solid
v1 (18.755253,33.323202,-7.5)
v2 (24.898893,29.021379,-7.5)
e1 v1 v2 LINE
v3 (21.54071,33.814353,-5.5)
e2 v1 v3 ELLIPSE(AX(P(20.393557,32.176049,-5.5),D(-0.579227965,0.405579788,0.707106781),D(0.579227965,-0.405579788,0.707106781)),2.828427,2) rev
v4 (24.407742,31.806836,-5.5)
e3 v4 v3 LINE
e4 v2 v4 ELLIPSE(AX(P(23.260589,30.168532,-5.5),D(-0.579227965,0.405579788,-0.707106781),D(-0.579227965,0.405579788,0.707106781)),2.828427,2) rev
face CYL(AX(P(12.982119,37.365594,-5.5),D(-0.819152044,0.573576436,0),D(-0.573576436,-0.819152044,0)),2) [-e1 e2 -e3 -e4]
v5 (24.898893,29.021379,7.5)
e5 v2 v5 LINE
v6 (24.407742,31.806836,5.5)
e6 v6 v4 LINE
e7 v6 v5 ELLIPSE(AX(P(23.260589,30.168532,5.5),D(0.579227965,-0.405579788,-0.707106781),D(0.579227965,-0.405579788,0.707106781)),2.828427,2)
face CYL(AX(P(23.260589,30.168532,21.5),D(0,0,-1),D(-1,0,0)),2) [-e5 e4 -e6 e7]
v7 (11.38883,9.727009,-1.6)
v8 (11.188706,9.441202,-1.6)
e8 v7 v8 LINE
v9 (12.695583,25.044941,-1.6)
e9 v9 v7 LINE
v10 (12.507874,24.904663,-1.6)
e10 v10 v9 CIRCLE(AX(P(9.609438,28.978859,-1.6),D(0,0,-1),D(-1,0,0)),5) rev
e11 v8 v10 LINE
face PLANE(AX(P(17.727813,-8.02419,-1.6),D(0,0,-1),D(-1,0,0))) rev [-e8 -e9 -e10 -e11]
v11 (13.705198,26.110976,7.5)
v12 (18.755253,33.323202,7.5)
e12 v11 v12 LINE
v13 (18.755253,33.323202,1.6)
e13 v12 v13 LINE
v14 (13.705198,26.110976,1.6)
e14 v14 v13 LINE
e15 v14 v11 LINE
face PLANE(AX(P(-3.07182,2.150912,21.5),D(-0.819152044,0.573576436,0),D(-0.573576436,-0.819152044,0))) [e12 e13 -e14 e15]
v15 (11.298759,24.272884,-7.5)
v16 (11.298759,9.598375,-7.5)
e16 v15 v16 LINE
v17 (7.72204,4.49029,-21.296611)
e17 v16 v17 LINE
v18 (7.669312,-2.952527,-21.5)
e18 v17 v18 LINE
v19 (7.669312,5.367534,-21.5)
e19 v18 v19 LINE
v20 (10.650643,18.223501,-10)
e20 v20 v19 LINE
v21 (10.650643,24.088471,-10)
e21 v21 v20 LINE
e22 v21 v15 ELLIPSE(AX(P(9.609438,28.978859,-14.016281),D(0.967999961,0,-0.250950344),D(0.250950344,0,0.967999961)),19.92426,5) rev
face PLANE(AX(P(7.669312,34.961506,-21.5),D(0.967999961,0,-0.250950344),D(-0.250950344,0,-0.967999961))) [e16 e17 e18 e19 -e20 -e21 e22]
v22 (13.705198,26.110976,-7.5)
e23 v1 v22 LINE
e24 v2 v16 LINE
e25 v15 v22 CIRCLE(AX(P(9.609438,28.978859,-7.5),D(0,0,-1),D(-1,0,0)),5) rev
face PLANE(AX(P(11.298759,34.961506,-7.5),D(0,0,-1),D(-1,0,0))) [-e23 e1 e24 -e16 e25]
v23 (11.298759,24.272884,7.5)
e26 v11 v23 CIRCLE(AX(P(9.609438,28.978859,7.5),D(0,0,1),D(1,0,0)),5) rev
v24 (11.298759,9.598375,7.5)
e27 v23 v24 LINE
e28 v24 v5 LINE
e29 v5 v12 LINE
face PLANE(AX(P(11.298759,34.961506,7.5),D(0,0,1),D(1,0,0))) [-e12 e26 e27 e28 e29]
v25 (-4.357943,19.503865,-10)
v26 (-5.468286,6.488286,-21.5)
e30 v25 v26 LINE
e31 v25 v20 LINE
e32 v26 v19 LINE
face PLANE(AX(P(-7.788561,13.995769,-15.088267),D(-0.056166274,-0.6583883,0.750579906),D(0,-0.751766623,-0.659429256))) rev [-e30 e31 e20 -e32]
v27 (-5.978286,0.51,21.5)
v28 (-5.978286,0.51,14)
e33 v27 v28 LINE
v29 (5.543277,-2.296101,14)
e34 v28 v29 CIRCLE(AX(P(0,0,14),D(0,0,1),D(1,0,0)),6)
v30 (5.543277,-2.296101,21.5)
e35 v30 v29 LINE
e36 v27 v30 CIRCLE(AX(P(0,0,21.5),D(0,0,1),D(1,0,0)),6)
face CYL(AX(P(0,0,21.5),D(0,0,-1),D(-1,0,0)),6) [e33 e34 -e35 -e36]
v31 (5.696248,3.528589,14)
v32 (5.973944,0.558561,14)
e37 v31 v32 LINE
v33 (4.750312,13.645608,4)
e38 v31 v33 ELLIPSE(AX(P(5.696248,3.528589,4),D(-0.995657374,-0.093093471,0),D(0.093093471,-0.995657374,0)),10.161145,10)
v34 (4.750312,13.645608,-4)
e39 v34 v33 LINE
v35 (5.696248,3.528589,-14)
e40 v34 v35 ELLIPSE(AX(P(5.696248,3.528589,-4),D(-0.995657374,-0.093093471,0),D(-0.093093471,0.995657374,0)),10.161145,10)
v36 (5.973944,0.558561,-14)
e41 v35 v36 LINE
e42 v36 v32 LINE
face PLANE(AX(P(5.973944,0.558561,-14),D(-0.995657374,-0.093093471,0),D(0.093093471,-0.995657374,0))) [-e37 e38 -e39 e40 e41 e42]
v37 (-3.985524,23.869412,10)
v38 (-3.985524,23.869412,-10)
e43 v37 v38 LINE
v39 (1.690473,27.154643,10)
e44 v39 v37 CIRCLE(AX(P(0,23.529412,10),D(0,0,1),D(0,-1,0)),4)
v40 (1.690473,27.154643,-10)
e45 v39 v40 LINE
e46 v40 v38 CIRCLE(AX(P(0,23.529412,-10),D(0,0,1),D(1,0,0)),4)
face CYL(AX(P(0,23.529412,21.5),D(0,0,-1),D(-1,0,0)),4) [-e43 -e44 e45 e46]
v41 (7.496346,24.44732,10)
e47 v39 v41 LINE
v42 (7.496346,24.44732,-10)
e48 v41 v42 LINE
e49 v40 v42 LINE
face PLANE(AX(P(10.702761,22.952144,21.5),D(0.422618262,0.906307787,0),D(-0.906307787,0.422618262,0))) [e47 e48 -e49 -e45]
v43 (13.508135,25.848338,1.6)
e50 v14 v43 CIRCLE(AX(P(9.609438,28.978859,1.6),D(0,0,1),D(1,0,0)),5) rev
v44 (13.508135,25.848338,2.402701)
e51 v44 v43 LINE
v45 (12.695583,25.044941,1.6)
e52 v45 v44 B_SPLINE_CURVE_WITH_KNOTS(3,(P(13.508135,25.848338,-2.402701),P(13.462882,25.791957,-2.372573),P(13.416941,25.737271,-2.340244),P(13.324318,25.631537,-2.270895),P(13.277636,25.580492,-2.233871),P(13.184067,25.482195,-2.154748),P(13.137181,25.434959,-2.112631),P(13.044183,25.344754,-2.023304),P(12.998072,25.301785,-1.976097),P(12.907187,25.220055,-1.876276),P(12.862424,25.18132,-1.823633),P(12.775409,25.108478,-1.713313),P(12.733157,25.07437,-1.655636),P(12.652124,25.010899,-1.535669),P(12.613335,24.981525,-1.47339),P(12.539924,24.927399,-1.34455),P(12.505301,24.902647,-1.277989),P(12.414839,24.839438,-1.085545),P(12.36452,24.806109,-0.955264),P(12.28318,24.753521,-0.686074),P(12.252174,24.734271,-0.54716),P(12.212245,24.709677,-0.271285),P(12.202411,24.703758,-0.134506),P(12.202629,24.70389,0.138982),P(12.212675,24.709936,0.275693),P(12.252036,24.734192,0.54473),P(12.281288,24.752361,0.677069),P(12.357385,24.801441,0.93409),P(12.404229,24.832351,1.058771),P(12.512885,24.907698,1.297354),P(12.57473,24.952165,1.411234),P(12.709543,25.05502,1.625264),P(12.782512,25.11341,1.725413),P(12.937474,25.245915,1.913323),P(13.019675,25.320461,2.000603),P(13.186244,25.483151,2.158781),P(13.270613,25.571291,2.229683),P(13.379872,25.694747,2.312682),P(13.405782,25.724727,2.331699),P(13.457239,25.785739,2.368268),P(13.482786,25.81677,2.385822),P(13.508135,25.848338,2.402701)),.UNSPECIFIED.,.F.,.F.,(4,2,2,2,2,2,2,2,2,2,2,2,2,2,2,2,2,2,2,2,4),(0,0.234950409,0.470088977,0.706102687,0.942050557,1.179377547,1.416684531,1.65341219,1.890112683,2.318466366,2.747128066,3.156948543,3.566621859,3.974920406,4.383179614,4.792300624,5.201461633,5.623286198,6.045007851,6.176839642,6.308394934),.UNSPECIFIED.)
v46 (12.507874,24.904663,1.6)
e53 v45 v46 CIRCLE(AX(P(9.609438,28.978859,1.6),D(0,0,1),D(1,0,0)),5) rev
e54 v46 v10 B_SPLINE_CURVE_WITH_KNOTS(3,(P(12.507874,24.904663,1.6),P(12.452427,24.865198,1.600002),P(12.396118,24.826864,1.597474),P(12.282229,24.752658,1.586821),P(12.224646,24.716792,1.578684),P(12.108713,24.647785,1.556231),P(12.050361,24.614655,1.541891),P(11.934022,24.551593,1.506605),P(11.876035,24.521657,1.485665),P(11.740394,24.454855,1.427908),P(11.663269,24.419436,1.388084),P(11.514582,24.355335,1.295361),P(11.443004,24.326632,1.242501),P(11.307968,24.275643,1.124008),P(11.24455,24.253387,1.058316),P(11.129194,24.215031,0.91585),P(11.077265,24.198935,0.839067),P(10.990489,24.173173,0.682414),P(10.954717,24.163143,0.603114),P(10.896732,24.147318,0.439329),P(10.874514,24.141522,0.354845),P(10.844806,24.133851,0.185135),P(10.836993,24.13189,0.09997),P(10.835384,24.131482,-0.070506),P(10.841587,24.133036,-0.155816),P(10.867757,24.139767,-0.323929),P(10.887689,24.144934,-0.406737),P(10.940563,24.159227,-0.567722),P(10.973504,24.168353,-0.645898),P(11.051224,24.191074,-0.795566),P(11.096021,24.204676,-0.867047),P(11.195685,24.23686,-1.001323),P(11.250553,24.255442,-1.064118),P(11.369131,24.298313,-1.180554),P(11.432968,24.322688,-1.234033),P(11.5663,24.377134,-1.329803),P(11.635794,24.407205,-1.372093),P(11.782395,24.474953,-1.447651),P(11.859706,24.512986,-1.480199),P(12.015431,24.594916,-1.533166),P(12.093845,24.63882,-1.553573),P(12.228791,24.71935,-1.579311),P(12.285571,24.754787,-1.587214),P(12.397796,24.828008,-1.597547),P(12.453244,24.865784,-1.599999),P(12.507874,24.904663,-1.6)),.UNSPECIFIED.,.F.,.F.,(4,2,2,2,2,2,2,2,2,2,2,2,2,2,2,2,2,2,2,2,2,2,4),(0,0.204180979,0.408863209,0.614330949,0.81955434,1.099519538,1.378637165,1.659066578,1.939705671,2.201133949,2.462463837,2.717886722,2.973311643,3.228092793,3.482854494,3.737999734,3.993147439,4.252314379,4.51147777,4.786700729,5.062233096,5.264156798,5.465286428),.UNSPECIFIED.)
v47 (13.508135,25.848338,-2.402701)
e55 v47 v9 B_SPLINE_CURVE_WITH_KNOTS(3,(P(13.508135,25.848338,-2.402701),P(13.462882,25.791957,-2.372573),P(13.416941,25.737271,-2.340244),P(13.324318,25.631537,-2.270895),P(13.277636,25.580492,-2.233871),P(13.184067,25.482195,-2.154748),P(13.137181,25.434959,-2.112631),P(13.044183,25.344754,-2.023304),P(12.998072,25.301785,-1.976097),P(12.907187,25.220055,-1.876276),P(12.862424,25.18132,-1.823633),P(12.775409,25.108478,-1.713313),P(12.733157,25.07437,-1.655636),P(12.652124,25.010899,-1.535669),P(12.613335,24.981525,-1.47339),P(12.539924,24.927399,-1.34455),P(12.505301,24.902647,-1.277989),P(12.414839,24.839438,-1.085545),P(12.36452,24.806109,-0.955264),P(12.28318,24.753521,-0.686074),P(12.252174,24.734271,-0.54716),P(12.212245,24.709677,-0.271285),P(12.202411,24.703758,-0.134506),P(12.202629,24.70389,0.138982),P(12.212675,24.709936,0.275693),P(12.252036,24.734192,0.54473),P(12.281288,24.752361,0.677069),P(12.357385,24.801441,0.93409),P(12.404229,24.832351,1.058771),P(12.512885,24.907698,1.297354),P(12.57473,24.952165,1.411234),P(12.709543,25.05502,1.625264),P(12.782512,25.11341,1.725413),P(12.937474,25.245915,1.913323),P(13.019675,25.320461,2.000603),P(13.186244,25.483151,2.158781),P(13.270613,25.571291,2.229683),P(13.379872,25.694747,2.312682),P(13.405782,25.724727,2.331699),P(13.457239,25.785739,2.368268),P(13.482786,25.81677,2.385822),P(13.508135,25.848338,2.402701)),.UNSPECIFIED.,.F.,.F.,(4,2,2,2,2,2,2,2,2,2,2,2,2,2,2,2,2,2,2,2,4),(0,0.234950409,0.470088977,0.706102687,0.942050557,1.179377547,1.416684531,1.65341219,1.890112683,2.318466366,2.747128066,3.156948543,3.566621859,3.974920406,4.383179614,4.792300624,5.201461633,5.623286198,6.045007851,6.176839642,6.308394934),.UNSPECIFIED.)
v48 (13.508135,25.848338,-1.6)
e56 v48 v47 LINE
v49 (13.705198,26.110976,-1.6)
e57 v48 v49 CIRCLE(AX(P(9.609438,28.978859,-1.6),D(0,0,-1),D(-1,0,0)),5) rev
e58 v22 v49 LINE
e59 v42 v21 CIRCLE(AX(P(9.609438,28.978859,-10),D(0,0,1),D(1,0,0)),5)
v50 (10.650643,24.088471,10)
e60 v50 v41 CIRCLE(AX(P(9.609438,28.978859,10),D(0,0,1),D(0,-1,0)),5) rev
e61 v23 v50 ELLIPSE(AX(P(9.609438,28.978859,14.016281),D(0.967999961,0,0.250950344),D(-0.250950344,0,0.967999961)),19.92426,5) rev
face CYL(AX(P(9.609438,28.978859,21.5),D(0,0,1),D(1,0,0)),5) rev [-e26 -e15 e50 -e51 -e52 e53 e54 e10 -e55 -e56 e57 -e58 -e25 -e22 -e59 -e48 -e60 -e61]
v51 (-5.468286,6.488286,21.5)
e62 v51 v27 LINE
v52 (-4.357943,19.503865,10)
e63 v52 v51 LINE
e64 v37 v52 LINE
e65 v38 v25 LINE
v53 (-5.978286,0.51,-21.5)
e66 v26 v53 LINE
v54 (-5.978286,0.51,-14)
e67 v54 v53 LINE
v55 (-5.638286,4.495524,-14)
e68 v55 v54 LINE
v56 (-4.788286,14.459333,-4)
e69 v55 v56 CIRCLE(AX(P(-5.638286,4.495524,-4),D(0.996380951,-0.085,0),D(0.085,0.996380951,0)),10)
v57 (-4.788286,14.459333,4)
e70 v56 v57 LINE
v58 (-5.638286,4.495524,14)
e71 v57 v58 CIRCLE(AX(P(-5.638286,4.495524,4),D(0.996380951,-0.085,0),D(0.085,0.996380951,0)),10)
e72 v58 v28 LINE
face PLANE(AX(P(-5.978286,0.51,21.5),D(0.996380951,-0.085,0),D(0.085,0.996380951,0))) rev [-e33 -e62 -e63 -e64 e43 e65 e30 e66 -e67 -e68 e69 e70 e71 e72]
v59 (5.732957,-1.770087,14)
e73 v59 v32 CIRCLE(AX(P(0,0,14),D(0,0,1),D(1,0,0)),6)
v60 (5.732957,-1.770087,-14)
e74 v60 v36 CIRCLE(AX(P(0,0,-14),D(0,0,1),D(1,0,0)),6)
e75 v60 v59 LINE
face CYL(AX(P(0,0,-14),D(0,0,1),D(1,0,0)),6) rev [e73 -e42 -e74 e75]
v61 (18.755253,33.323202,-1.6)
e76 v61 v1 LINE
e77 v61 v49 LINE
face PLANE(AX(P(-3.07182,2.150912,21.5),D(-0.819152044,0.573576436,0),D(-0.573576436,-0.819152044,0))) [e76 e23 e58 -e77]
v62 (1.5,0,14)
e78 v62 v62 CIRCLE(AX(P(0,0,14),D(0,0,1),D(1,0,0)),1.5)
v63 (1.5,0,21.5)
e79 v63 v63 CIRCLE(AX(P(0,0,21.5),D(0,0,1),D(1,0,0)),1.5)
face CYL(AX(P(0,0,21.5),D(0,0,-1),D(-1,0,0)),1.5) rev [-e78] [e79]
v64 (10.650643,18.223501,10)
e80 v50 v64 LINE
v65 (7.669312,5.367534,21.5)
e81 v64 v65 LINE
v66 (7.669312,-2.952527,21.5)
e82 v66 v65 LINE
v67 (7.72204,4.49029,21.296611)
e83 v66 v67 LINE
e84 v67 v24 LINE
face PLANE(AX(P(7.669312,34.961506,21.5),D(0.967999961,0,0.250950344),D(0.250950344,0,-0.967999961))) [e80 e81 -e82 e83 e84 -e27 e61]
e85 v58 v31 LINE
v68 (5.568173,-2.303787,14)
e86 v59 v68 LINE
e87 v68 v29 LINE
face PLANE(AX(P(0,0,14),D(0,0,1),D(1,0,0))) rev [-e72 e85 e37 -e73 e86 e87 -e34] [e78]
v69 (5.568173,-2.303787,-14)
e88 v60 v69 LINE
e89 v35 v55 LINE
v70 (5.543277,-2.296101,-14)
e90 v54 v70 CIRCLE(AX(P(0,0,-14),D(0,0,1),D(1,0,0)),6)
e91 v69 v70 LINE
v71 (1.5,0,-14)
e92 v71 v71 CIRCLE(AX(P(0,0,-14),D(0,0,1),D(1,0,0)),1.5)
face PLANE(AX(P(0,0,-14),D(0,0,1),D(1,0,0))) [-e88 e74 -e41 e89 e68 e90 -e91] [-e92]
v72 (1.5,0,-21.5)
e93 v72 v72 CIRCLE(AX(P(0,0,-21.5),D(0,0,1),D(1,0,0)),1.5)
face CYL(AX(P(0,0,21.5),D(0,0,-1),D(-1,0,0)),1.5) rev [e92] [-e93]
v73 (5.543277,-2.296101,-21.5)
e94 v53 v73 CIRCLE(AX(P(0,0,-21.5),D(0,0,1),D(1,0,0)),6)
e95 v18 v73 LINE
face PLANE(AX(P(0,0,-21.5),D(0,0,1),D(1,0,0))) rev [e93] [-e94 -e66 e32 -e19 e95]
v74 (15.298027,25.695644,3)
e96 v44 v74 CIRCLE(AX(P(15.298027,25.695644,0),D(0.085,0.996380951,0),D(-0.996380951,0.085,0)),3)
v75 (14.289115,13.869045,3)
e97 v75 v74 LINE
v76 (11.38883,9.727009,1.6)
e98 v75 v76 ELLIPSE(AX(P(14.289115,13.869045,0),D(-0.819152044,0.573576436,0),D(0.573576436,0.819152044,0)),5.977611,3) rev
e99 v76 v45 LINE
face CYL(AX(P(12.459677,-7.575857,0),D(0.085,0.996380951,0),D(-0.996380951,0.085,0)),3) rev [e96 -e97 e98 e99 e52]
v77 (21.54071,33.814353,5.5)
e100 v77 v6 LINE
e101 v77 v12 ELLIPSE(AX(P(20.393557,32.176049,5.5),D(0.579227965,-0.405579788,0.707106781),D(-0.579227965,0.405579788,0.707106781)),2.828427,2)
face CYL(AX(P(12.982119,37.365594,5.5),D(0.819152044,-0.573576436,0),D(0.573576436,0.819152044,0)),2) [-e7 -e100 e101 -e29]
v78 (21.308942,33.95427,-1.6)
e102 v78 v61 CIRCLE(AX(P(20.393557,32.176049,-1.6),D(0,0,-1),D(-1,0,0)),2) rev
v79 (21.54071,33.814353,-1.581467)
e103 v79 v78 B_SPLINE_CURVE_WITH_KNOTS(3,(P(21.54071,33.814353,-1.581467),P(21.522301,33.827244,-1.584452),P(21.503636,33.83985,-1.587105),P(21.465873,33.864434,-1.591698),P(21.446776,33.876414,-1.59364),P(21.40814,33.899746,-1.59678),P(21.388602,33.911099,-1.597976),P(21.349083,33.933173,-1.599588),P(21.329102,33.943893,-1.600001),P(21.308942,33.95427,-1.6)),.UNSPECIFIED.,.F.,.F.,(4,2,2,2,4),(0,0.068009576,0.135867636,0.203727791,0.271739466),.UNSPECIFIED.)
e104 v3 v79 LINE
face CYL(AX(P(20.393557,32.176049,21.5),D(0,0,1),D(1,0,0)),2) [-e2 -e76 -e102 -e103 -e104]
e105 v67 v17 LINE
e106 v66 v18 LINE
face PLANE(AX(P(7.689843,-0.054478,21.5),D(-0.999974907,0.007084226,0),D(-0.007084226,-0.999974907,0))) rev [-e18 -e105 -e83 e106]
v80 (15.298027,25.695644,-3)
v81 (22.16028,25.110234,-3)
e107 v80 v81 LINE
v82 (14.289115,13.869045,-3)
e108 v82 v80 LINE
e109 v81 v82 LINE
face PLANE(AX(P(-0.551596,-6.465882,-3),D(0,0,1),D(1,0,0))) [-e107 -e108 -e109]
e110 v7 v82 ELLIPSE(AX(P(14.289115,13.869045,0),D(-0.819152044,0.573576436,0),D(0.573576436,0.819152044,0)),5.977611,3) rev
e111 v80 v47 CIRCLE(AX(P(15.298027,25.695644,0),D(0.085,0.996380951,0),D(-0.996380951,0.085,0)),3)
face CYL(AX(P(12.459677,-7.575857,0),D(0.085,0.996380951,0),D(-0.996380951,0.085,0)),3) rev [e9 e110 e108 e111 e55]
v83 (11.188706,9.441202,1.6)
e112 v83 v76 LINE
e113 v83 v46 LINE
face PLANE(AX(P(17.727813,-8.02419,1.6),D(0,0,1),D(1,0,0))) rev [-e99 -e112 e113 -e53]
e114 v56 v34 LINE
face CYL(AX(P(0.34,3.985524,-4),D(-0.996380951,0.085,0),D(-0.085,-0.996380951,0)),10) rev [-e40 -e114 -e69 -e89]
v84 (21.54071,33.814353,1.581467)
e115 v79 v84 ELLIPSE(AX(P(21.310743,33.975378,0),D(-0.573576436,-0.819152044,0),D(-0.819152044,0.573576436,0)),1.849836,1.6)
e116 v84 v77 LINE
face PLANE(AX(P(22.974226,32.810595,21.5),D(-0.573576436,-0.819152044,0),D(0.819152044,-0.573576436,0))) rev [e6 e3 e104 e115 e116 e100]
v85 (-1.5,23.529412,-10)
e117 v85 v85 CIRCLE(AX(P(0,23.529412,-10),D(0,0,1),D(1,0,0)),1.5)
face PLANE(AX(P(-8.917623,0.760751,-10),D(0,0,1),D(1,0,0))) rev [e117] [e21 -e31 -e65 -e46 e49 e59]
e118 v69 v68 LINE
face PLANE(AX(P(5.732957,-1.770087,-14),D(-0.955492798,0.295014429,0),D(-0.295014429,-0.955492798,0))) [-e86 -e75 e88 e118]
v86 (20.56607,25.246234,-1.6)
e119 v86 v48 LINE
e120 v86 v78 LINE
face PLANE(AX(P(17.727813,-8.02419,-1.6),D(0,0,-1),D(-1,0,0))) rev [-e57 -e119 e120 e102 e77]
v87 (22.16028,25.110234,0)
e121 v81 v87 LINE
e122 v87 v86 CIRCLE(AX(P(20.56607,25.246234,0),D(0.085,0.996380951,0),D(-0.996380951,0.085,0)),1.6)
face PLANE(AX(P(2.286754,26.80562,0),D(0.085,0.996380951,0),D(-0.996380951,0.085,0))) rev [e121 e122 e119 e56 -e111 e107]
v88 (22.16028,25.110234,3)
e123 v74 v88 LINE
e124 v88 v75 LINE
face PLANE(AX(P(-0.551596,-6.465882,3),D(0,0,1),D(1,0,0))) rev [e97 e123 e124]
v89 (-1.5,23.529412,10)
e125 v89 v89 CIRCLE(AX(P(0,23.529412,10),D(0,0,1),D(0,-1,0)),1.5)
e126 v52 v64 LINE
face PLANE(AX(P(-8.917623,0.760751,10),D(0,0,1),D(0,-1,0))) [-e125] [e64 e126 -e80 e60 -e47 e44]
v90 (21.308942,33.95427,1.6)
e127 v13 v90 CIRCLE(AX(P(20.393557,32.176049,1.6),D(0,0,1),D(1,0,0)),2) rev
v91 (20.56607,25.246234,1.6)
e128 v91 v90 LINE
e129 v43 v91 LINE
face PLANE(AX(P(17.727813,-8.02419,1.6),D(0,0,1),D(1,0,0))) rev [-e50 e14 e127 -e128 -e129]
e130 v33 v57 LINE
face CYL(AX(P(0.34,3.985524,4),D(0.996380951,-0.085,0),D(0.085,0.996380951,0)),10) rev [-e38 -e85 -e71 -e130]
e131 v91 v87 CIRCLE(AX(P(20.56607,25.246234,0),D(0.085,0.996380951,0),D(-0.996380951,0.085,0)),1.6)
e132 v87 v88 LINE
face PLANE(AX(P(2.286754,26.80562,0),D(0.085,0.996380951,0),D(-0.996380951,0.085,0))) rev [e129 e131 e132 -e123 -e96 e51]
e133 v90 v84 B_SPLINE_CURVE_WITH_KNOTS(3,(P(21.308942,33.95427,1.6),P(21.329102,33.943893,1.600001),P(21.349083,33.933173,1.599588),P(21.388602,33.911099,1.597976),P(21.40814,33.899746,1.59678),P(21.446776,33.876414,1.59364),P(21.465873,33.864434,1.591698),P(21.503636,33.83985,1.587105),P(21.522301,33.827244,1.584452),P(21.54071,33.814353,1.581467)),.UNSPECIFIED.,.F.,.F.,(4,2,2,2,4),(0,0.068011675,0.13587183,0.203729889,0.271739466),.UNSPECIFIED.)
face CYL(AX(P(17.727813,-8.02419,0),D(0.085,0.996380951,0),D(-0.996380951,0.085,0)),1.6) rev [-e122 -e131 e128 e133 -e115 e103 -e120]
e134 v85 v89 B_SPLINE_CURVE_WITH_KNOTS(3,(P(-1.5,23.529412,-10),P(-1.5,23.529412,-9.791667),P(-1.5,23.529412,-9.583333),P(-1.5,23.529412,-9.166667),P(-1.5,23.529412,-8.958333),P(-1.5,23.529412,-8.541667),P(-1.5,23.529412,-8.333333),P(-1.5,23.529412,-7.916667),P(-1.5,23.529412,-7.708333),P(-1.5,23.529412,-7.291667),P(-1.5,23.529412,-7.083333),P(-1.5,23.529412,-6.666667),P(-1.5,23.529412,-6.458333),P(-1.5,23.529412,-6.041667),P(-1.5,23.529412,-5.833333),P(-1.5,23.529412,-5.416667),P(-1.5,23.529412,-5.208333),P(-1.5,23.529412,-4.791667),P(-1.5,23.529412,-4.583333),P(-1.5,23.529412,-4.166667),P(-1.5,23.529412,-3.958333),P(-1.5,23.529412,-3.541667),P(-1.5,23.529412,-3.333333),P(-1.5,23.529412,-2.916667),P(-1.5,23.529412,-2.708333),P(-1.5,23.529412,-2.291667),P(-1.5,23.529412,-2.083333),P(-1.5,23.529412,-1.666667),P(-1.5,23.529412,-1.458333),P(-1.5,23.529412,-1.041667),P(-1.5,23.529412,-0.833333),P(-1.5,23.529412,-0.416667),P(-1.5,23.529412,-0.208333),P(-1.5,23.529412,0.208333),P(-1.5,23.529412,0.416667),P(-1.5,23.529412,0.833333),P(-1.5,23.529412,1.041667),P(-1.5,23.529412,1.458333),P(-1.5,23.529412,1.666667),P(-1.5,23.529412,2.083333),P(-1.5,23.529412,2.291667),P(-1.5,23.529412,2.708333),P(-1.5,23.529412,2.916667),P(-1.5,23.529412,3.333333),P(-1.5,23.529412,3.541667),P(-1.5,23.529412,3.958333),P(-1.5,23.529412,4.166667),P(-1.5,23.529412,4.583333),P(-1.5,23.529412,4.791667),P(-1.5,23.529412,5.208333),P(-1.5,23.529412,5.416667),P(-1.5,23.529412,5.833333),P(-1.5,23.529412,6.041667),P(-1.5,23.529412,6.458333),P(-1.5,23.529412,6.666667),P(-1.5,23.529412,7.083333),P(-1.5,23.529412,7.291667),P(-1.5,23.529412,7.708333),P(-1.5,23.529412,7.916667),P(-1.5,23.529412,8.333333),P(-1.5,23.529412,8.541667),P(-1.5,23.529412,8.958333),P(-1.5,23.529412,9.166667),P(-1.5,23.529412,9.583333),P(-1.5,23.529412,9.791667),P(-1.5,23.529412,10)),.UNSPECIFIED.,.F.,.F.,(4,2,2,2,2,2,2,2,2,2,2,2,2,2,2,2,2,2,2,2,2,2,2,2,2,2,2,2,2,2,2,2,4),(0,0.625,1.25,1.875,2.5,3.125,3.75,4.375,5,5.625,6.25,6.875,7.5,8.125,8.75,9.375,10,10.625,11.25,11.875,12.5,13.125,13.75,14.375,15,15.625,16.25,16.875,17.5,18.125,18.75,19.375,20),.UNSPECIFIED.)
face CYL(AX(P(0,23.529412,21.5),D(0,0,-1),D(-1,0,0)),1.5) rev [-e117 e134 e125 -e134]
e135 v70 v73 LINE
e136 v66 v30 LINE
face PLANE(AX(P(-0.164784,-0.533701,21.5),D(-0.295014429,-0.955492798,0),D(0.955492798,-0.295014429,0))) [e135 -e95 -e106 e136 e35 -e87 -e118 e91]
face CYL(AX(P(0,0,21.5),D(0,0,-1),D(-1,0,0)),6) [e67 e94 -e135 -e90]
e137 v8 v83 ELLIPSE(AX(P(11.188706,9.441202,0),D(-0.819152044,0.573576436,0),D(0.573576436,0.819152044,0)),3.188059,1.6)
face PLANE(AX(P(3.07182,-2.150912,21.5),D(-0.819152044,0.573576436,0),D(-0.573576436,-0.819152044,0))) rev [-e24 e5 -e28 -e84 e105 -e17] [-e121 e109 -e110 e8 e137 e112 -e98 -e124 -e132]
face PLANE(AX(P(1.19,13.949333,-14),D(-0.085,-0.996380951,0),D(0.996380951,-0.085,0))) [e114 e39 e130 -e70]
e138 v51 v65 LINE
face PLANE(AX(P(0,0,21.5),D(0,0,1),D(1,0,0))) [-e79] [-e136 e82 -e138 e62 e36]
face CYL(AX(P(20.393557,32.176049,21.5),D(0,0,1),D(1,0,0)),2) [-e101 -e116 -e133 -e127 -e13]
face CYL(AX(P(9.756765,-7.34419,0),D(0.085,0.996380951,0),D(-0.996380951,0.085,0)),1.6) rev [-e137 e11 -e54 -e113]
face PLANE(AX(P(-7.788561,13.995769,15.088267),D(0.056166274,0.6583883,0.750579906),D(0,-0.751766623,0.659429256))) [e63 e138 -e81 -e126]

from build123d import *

# Parameters (mm, degrees)
SKETCH2_R                 = 1.5
MAIN_EXTRUDE_DEPTH        = 21.5
HORIZONTAL_CUT_DEPTH      = 48.59062889
HORIZONTAL_CUT_DEPTH_BACK = 48.59062889
SKETCH5_OUTSIDE_W         = 47.542
SKETCH5_OUTSIDE_H         = 58.496
VERTICAL_CUT_DEPTH        = 15.063100578
END_FILLET_R              = 2
SPRING_PLACE_CUT_DEPTH    = 14
FILLET5_R                 = 10
FILLET4_R                 = 5
CUT_EXTRUDE1_DEPTH        = 52.882041504
CUT_EXTRUDE2_START        = -16.243126
CUT_EXTRUDE2_DEPTH        = 16.243126


# Read off the part's stored shape, not the designer's step: vertical-cut
with BuildPart() as part:
    # Sketch2 → main-extrude (new, symmetric)
    with BuildSketch(Plane.XY):
        with BuildLine():
            Line((26.046045858, 30.659682992), (19.902405526, 34.961506265))
            Line((19.902405526, 34.961506265), (11.298758981, 22.6742256))
            Line((11.298758981, 22.6742256), (1.690473047, 27.154642913))
            ThreePointArc((1.690473047, 27.154642913), (-2.003746596, 26.991347579), (-3.985523805, 23.869411765))
            Line((-3.985523805, 23.869411765), (-5.978285707, 0.51))
            ThreePointArc((-5.978285707, 0.51), (-1.419809226, -5.829591904), (5.543277195, -2.296100594))
            Line((5.543277195, -2.296100594), (7.669311717, -2.952527164))
            Line((7.669311717, -2.952527164), (7.722039638, 4.490290033))
            Line((7.722039638, 4.490290033), (26.046045858, 30.659682992))
        make_face()
        Circle(SKETCH2_R, mode=Mode.SUBTRACT)
        with Locations((0, 23.529411765)):
            Circle(SKETCH2_R, mode=Mode.SUBTRACT)
    extrude(amount=MAIN_EXTRUDE_DEPTH, both=True)

    # Sketch5 outside → horizontal-cut (cut, two sides: drawn at the far end of the back side and taken through both)
    with BuildSketch(Plane(origin=(0, 27.529411765, 0), x_dir=(-1, 0, 0), z_dir=(0, -1, 0)).offset(-HORIZONTAL_CUT_DEPTH_BACK)):
        with Locations((-10.023, 0)):
            Rectangle(SKETCH5_OUTSIDE_W, SKETCH5_OUTSIDE_H)
        Polygon((-5.543277195, -21.5), (6, -21.5), (6, 21.5), (-5.543277195, 21.5), (-7.669311717, 21.5), (-11.298758981, 7.5), (-26.046045858, 7.5), (-26.046045858, -7.5), (-11.298758981, -7.5), (-7.669311717, -21.5), align=None, mode=Mode.SUBTRACT)
    extrude(amount=HORIZONTAL_CUT_DEPTH + HORIZONTAL_CUT_DEPTH_BACK, mode=Mode.SUBTRACT)

    # vertical-cut outline → vertical-cut (cut)
    with BuildSketch(Plane(origin=(-1.956623805, 47.652438964, 0), x_dir=(0, 0, 1), z_dir=(0.9963809512430475, -0.08499999999999992, 0))):
        Polygon((10, 28.250815058), (10, 18), (21.5, 18), (21.5, 41.313669441), align=None)
        Polygon((-21.5, 18), (-10, 18), (-10, 28.250815058), (-21.5, 41.313669441), align=None)
    extrude(amount=VERTICAL_CUT_DEPTH, mode=Mode.SUBTRACT)

    # end-fillet
    end_fillet_edges = [part.edges().sort_by_distance(p)[0] for p in [
        (19.902405526, 34.961506265, 0),
        (26.046045858, 30.659682992, 0),
        (22.974225692, 32.810594628, 7.5),
        (22.974225692, 32.810594628, -7.5),
    ]]
    fillet(end_fillet_edges, radius=END_FILLET_R)

    # Sketch13 → spring-place-cut (cut, symmetric)
    with BuildSketch(Plane.XY):
        with BuildLine():
            Line((4.750311853, 13.645607612), (-4.788285707, 14.459333317))
            Line((-4.788285707, 14.459333317), (-5.468285707, 6.488285707))
            Line((-5.468285707, 6.488285707), (-5.978285707, 0.51))
            ThreePointArc((-5.978285707, 0.51), (-1.419809226, -5.829591904), (5.543277195, -2.296100594))
            Line((5.543277195, -2.296100594), (5.568173284, -2.303787419))
            Line((5.568173284, -2.303787419), (5.732956787, -1.770086573))
            ThreePointArc((5.732956787, -1.770086573), (5.96812639, -0.61763047), (5.973944242, 0.558560826))
            Line((5.973944242, 0.558560826), (4.750311853, 13.645607612))
        make_face()
    extrude(amount=SPRING_PLACE_CUT_DEPTH, both=True, mode=Mode.SUBTRACT)

    # Fillet5
    fillet5_edges = [part.edges().sort_by_distance(p)[0] for p in [
        (-0.018986927, 14.052470465, 14),
        (-0.018986927, 14.052470465, -14),
    ]]
    fillet(fillet5_edges, radius=FILLET5_R)

    # Fillet4
    # the kernel refuses this fillet: 5 mm, written as the material it adds along each edge
    with BuildSketch(Plane(origin=(11.298758981, 22.6742256, -17.98874539), x_dir=(-0.9063077870366477, 0.42261826174070405, 0), z_dir=(0, 0, 1))) as fillet4_piece_1_section:
        with BuildLine():
            CenterArc((FILLET4_R * 0.839099631177, -FILLET4_R), FILLET4_R, 90, 80)
            Line((-FILLET4_R * 0.145708121835, -FILLET4_R * 0.826351822333), (0, 0))
            Line((0, 0), (FILLET4_R * 0.839099631177, 0))
        make_face()
    fillet4_piece_1 = extrude(amount=25.48874539, mode=Mode.PRIVATE)
    fillet4_piece_1 = split(fillet4_piece_1, bisect_by=Plane(origin=(9.938648559, 23.630642265, -10), z_dir=(0, 0, 1)), keep=Keep.TOP, mode=Mode.PRIVATE)
    fillet4_piece_1 = split(fillet4_piece_1, bisect_by=Plane(origin=(10.933336463, 23.630642265, -8.909557674), z_dir=(-0.9679999612731994, 0, 0.25095034364408525)), keep=Keep.TOP, mode=Mode.PRIVATE)
    fillet4_piece_1 = split(fillet4_piece_1, bisect_by=Plane(origin=(9.938648559, 23.630642265, -7.5), z_dir=(0, 0, -1)), keep=Keep.TOP, mode=Mode.PRIVATE)
    add(fillet4_piece_1)
    with BuildSketch(Plane(origin=(11.298758981, 22.6742256, -7.5), x_dir=(-0.9063077870366477, 0.42261826174070405, 0), z_dir=(0, 0, 1))) as fillet4_piece_2_section:
        with BuildLine():
            CenterArc((FILLET4_R * 0.839099631177, -FILLET4_R), FILLET4_R, 90, 80)
            Line((-FILLET4_R * 0.145708121835, -FILLET4_R * 0.826351822333), (0, 0))
            Line((0, 0), (FILLET4_R * 0.839099631177, 0))
        make_face()
    fillet4_piece_2 = extrude(amount=15, mode=Mode.PRIVATE)
    fillet4_piece_2 = split(fillet4_piece_2, bisect_by=Plane(origin=(13.081425039, 23.673797808, 0.623656853), z_dir=(-0.9679999612731994, 0, -0.2509503436440852)), keep=Keep.TOP, mode=Mode.PRIVATE)
    fillet4_piece_2 = split(fillet4_piece_2, bisect_by=Plane(origin=(13.081425039, 23.673797808, -0.623656853), z_dir=(-0.9679999612731994, 0, 0.25095034364408525)), keep=Keep.TOP, mode=Mode.PRIVATE)
    add(fillet4_piece_2)
    with BuildSketch(Plane(origin=(11.298758981, 22.6742256, -7.5), x_dir=(-0.9063077870366477, 0.42261826174070405, 0), z_dir=(0, 0, 1))) as fillet4_piece_3_section:
        with BuildLine():
            CenterArc((FILLET4_R * 0.839099631177, -FILLET4_R), FILLET4_R, 90, 80)
            Line((-FILLET4_R * 0.145708121835, -FILLET4_R * 0.826351822333), (0, 0))
            Line((0, 0), (FILLET4_R * 0.839099631177, 0))
        make_face()
    fillet4_piece_3 = extrude(amount=15, mode=Mode.PRIVATE)
    fillet4_piece_3 = split(fillet4_piece_3, bisect_by=Plane(origin=(14.480371863, 24.591366471, -4.772552021), z_dir=(-0.9679999612731994, 0, -0.2509503436440852)), keep=Keep.TOP, mode=Mode.PRIVATE)
    fillet4_piece_3 = split(fillet4_piece_3, bisect_by=Plane(origin=(11.912432267, 24.591366471, -5.132855534), z_dir=(0.9679999612731994, 0, -0.25095034364408525)), keep=Keep.TOP, mode=Mode.PRIVATE)
    add(fillet4_piece_3)
    with BuildSketch(Plane(origin=(11.298758981, 22.6742256, -7.5), x_dir=(-0.9063077870366477, 0.42261826174070405, 0), z_dir=(0, 0, 1))) as fillet4_piece_4_section:
        with BuildLine():
            CenterArc((FILLET4_R * 0.839099631177, -FILLET4_R), FILLET4_R, 90, 80)
            Line((-FILLET4_R * 0.145708121835, -FILLET4_R * 0.826351822333), (0, 0))
            Line((0, 0), (FILLET4_R * 0.839099631177, 0))
        make_face()
    fillet4_piece_4 = extrude(amount=15, mode=Mode.PRIVATE)
    fillet4_piece_4 = split(fillet4_piece_4, bisect_by=Plane(origin=(11.912432267, 24.591366471, 5.132855534), z_dir=(0.9679999612731994, 0, 0.2509503436440852)), keep=Keep.TOP, mode=Mode.PRIVATE)
    fillet4_piece_4 = split(fillet4_piece_4, bisect_by=Plane(origin=(14.480371863, 24.591366471, 4.772552021), z_dir=(-0.9679999612731994, 0, 0.25095034364408525)), keep=Keep.TOP, mode=Mode.PRIVATE)
    add(fillet4_piece_4)
    with BuildSketch(Plane(origin=(11.298758981, 22.6742256, -7.5), x_dir=(-0.9063077870366477, 0.42261826174070405, 0), z_dir=(0, 0, 1))) as fillet4_piece_5_section:
        with BuildLine():
            CenterArc((FILLET4_R * 0.839099631177, -FILLET4_R), FILLET4_R, 90, 80)
            Line((-FILLET4_R * 0.145708121835, -FILLET4_R * 0.826351822333), (0, 0))
            Line((0, 0), (FILLET4_R * 0.839099631177, 0))
        make_face()
    fillet4_piece_5 = extrude(amount=25.48874539, mode=Mode.PRIVATE)
    fillet4_piece_5 = split(fillet4_piece_5, bisect_by=Plane(origin=(9.938648559, 23.630642265, 10), z_dir=(0, 0, -1)), keep=Keep.TOP, mode=Mode.PRIVATE)
    fillet4_piece_5 = split(fillet4_piece_5, bisect_by=Plane(origin=(10.933336463, 23.630642265, 8.909557674), z_dir=(-0.9679999612731994, 0, -0.2509503436440852)), keep=Keep.TOP, mode=Mode.PRIVATE)
    fillet4_piece_5 = split(fillet4_piece_5, bisect_by=Plane(origin=(9.938648559, 23.630642265, 7.5), z_dir=(0, 0, 1)), keep=Keep.TOP, mode=Mode.PRIVATE)
    add(fillet4_piece_5)
    with BuildSketch(Plane(origin=(11.298758981, 22.6742256, -7.5), x_dir=(-0.9063077870366477, 0.42261826174070405, 0), z_dir=(0, 0, 1))) as fillet4_piece_6_section:
        with BuildLine():
            CenterArc((FILLET4_R * 0.839099631177, -FILLET4_R), FILLET4_R, 90, 80)
            Line((-FILLET4_R * 0.145708121835, -FILLET4_R * 0.826351822333), (0, 0))
            Line((0, 0), (FILLET4_R * 0.839099631177, 0))
        make_face()
    fillet4_piece_6 = extrude(amount=15, mode=Mode.PRIVATE)
    fillet4_piece_6 = split(fillet4_piece_6, bisect_by=Plane(origin=(13.263621158, 25.832677019, -0.079134917), z_dir=(0.9679999612731994, 0, 0.2509503436440852)), keep=Keep.TOP, mode=Mode.PRIVATE)
    fillet4_piece_6 = split(fillet4_piece_6, bisect_by=Plane(origin=(13.263621158, 25.832677019, 0.079134917), z_dir=(0.9679999612731994, 0, -0.25095034364408525)), keep=Keep.TOP, mode=Mode.PRIVATE)
    add(fillet4_piece_6)

    # Sketch16 → Cut-Extrude1 (cut, through all)
    with BuildSketch(Plane(origin=(3.042409669, 35.663518124, 0), x_dir=(0.9963809512430474, -0.08499999999999996, 0), z_dir=(0.08499999999999996, 0.9963809512430474, 0))):
        with BuildLine():
            Line((18.345710894, -1.6), (10.345710894, -1.6))
            ThreePointArc((10.345710894, -1.6), (8.745710894, 0), (10.345710894, 1.6))
            Line((10.345710894, 1.6), (18.345710894, 1.6))
            ThreePointArc((18.345710894, 1.6), (19.945710894, 0), (18.345710894, -1.6))
        make_face()
    extrude(amount=-CUT_EXTRUDE1_DEPTH, mode=Mode.SUBTRACT)

    # Sketch17 → Cut-Extrude2 (cut)
    with BuildSketch(Plane(origin=(2.286753534, 26.80561955, 0), x_dir=(0.9963809512430474, -0.08499999999999996, 0), z_dir=(0.08499999999999996, 0.9963809512430474, 0)).offset(CUT_EXTRUDE2_START)):
        with BuildLine():
            Line((24.627792818, 3), (13.058532698, 3))
            ThreePointArc((13.058532698, 3), (10.058532698, 0), (13.058532698, -3))
            Line((13.058532698, -3), (24.627792818, -3))
            ThreePointArc((24.627792818, -3), (27.627792818, 0), (24.627792818, 3))
        make_face()
    extrude(amount=CUT_EXTRUDE2_DEPTH, mode=Mode.SUBTRACT)


solid = part.part
